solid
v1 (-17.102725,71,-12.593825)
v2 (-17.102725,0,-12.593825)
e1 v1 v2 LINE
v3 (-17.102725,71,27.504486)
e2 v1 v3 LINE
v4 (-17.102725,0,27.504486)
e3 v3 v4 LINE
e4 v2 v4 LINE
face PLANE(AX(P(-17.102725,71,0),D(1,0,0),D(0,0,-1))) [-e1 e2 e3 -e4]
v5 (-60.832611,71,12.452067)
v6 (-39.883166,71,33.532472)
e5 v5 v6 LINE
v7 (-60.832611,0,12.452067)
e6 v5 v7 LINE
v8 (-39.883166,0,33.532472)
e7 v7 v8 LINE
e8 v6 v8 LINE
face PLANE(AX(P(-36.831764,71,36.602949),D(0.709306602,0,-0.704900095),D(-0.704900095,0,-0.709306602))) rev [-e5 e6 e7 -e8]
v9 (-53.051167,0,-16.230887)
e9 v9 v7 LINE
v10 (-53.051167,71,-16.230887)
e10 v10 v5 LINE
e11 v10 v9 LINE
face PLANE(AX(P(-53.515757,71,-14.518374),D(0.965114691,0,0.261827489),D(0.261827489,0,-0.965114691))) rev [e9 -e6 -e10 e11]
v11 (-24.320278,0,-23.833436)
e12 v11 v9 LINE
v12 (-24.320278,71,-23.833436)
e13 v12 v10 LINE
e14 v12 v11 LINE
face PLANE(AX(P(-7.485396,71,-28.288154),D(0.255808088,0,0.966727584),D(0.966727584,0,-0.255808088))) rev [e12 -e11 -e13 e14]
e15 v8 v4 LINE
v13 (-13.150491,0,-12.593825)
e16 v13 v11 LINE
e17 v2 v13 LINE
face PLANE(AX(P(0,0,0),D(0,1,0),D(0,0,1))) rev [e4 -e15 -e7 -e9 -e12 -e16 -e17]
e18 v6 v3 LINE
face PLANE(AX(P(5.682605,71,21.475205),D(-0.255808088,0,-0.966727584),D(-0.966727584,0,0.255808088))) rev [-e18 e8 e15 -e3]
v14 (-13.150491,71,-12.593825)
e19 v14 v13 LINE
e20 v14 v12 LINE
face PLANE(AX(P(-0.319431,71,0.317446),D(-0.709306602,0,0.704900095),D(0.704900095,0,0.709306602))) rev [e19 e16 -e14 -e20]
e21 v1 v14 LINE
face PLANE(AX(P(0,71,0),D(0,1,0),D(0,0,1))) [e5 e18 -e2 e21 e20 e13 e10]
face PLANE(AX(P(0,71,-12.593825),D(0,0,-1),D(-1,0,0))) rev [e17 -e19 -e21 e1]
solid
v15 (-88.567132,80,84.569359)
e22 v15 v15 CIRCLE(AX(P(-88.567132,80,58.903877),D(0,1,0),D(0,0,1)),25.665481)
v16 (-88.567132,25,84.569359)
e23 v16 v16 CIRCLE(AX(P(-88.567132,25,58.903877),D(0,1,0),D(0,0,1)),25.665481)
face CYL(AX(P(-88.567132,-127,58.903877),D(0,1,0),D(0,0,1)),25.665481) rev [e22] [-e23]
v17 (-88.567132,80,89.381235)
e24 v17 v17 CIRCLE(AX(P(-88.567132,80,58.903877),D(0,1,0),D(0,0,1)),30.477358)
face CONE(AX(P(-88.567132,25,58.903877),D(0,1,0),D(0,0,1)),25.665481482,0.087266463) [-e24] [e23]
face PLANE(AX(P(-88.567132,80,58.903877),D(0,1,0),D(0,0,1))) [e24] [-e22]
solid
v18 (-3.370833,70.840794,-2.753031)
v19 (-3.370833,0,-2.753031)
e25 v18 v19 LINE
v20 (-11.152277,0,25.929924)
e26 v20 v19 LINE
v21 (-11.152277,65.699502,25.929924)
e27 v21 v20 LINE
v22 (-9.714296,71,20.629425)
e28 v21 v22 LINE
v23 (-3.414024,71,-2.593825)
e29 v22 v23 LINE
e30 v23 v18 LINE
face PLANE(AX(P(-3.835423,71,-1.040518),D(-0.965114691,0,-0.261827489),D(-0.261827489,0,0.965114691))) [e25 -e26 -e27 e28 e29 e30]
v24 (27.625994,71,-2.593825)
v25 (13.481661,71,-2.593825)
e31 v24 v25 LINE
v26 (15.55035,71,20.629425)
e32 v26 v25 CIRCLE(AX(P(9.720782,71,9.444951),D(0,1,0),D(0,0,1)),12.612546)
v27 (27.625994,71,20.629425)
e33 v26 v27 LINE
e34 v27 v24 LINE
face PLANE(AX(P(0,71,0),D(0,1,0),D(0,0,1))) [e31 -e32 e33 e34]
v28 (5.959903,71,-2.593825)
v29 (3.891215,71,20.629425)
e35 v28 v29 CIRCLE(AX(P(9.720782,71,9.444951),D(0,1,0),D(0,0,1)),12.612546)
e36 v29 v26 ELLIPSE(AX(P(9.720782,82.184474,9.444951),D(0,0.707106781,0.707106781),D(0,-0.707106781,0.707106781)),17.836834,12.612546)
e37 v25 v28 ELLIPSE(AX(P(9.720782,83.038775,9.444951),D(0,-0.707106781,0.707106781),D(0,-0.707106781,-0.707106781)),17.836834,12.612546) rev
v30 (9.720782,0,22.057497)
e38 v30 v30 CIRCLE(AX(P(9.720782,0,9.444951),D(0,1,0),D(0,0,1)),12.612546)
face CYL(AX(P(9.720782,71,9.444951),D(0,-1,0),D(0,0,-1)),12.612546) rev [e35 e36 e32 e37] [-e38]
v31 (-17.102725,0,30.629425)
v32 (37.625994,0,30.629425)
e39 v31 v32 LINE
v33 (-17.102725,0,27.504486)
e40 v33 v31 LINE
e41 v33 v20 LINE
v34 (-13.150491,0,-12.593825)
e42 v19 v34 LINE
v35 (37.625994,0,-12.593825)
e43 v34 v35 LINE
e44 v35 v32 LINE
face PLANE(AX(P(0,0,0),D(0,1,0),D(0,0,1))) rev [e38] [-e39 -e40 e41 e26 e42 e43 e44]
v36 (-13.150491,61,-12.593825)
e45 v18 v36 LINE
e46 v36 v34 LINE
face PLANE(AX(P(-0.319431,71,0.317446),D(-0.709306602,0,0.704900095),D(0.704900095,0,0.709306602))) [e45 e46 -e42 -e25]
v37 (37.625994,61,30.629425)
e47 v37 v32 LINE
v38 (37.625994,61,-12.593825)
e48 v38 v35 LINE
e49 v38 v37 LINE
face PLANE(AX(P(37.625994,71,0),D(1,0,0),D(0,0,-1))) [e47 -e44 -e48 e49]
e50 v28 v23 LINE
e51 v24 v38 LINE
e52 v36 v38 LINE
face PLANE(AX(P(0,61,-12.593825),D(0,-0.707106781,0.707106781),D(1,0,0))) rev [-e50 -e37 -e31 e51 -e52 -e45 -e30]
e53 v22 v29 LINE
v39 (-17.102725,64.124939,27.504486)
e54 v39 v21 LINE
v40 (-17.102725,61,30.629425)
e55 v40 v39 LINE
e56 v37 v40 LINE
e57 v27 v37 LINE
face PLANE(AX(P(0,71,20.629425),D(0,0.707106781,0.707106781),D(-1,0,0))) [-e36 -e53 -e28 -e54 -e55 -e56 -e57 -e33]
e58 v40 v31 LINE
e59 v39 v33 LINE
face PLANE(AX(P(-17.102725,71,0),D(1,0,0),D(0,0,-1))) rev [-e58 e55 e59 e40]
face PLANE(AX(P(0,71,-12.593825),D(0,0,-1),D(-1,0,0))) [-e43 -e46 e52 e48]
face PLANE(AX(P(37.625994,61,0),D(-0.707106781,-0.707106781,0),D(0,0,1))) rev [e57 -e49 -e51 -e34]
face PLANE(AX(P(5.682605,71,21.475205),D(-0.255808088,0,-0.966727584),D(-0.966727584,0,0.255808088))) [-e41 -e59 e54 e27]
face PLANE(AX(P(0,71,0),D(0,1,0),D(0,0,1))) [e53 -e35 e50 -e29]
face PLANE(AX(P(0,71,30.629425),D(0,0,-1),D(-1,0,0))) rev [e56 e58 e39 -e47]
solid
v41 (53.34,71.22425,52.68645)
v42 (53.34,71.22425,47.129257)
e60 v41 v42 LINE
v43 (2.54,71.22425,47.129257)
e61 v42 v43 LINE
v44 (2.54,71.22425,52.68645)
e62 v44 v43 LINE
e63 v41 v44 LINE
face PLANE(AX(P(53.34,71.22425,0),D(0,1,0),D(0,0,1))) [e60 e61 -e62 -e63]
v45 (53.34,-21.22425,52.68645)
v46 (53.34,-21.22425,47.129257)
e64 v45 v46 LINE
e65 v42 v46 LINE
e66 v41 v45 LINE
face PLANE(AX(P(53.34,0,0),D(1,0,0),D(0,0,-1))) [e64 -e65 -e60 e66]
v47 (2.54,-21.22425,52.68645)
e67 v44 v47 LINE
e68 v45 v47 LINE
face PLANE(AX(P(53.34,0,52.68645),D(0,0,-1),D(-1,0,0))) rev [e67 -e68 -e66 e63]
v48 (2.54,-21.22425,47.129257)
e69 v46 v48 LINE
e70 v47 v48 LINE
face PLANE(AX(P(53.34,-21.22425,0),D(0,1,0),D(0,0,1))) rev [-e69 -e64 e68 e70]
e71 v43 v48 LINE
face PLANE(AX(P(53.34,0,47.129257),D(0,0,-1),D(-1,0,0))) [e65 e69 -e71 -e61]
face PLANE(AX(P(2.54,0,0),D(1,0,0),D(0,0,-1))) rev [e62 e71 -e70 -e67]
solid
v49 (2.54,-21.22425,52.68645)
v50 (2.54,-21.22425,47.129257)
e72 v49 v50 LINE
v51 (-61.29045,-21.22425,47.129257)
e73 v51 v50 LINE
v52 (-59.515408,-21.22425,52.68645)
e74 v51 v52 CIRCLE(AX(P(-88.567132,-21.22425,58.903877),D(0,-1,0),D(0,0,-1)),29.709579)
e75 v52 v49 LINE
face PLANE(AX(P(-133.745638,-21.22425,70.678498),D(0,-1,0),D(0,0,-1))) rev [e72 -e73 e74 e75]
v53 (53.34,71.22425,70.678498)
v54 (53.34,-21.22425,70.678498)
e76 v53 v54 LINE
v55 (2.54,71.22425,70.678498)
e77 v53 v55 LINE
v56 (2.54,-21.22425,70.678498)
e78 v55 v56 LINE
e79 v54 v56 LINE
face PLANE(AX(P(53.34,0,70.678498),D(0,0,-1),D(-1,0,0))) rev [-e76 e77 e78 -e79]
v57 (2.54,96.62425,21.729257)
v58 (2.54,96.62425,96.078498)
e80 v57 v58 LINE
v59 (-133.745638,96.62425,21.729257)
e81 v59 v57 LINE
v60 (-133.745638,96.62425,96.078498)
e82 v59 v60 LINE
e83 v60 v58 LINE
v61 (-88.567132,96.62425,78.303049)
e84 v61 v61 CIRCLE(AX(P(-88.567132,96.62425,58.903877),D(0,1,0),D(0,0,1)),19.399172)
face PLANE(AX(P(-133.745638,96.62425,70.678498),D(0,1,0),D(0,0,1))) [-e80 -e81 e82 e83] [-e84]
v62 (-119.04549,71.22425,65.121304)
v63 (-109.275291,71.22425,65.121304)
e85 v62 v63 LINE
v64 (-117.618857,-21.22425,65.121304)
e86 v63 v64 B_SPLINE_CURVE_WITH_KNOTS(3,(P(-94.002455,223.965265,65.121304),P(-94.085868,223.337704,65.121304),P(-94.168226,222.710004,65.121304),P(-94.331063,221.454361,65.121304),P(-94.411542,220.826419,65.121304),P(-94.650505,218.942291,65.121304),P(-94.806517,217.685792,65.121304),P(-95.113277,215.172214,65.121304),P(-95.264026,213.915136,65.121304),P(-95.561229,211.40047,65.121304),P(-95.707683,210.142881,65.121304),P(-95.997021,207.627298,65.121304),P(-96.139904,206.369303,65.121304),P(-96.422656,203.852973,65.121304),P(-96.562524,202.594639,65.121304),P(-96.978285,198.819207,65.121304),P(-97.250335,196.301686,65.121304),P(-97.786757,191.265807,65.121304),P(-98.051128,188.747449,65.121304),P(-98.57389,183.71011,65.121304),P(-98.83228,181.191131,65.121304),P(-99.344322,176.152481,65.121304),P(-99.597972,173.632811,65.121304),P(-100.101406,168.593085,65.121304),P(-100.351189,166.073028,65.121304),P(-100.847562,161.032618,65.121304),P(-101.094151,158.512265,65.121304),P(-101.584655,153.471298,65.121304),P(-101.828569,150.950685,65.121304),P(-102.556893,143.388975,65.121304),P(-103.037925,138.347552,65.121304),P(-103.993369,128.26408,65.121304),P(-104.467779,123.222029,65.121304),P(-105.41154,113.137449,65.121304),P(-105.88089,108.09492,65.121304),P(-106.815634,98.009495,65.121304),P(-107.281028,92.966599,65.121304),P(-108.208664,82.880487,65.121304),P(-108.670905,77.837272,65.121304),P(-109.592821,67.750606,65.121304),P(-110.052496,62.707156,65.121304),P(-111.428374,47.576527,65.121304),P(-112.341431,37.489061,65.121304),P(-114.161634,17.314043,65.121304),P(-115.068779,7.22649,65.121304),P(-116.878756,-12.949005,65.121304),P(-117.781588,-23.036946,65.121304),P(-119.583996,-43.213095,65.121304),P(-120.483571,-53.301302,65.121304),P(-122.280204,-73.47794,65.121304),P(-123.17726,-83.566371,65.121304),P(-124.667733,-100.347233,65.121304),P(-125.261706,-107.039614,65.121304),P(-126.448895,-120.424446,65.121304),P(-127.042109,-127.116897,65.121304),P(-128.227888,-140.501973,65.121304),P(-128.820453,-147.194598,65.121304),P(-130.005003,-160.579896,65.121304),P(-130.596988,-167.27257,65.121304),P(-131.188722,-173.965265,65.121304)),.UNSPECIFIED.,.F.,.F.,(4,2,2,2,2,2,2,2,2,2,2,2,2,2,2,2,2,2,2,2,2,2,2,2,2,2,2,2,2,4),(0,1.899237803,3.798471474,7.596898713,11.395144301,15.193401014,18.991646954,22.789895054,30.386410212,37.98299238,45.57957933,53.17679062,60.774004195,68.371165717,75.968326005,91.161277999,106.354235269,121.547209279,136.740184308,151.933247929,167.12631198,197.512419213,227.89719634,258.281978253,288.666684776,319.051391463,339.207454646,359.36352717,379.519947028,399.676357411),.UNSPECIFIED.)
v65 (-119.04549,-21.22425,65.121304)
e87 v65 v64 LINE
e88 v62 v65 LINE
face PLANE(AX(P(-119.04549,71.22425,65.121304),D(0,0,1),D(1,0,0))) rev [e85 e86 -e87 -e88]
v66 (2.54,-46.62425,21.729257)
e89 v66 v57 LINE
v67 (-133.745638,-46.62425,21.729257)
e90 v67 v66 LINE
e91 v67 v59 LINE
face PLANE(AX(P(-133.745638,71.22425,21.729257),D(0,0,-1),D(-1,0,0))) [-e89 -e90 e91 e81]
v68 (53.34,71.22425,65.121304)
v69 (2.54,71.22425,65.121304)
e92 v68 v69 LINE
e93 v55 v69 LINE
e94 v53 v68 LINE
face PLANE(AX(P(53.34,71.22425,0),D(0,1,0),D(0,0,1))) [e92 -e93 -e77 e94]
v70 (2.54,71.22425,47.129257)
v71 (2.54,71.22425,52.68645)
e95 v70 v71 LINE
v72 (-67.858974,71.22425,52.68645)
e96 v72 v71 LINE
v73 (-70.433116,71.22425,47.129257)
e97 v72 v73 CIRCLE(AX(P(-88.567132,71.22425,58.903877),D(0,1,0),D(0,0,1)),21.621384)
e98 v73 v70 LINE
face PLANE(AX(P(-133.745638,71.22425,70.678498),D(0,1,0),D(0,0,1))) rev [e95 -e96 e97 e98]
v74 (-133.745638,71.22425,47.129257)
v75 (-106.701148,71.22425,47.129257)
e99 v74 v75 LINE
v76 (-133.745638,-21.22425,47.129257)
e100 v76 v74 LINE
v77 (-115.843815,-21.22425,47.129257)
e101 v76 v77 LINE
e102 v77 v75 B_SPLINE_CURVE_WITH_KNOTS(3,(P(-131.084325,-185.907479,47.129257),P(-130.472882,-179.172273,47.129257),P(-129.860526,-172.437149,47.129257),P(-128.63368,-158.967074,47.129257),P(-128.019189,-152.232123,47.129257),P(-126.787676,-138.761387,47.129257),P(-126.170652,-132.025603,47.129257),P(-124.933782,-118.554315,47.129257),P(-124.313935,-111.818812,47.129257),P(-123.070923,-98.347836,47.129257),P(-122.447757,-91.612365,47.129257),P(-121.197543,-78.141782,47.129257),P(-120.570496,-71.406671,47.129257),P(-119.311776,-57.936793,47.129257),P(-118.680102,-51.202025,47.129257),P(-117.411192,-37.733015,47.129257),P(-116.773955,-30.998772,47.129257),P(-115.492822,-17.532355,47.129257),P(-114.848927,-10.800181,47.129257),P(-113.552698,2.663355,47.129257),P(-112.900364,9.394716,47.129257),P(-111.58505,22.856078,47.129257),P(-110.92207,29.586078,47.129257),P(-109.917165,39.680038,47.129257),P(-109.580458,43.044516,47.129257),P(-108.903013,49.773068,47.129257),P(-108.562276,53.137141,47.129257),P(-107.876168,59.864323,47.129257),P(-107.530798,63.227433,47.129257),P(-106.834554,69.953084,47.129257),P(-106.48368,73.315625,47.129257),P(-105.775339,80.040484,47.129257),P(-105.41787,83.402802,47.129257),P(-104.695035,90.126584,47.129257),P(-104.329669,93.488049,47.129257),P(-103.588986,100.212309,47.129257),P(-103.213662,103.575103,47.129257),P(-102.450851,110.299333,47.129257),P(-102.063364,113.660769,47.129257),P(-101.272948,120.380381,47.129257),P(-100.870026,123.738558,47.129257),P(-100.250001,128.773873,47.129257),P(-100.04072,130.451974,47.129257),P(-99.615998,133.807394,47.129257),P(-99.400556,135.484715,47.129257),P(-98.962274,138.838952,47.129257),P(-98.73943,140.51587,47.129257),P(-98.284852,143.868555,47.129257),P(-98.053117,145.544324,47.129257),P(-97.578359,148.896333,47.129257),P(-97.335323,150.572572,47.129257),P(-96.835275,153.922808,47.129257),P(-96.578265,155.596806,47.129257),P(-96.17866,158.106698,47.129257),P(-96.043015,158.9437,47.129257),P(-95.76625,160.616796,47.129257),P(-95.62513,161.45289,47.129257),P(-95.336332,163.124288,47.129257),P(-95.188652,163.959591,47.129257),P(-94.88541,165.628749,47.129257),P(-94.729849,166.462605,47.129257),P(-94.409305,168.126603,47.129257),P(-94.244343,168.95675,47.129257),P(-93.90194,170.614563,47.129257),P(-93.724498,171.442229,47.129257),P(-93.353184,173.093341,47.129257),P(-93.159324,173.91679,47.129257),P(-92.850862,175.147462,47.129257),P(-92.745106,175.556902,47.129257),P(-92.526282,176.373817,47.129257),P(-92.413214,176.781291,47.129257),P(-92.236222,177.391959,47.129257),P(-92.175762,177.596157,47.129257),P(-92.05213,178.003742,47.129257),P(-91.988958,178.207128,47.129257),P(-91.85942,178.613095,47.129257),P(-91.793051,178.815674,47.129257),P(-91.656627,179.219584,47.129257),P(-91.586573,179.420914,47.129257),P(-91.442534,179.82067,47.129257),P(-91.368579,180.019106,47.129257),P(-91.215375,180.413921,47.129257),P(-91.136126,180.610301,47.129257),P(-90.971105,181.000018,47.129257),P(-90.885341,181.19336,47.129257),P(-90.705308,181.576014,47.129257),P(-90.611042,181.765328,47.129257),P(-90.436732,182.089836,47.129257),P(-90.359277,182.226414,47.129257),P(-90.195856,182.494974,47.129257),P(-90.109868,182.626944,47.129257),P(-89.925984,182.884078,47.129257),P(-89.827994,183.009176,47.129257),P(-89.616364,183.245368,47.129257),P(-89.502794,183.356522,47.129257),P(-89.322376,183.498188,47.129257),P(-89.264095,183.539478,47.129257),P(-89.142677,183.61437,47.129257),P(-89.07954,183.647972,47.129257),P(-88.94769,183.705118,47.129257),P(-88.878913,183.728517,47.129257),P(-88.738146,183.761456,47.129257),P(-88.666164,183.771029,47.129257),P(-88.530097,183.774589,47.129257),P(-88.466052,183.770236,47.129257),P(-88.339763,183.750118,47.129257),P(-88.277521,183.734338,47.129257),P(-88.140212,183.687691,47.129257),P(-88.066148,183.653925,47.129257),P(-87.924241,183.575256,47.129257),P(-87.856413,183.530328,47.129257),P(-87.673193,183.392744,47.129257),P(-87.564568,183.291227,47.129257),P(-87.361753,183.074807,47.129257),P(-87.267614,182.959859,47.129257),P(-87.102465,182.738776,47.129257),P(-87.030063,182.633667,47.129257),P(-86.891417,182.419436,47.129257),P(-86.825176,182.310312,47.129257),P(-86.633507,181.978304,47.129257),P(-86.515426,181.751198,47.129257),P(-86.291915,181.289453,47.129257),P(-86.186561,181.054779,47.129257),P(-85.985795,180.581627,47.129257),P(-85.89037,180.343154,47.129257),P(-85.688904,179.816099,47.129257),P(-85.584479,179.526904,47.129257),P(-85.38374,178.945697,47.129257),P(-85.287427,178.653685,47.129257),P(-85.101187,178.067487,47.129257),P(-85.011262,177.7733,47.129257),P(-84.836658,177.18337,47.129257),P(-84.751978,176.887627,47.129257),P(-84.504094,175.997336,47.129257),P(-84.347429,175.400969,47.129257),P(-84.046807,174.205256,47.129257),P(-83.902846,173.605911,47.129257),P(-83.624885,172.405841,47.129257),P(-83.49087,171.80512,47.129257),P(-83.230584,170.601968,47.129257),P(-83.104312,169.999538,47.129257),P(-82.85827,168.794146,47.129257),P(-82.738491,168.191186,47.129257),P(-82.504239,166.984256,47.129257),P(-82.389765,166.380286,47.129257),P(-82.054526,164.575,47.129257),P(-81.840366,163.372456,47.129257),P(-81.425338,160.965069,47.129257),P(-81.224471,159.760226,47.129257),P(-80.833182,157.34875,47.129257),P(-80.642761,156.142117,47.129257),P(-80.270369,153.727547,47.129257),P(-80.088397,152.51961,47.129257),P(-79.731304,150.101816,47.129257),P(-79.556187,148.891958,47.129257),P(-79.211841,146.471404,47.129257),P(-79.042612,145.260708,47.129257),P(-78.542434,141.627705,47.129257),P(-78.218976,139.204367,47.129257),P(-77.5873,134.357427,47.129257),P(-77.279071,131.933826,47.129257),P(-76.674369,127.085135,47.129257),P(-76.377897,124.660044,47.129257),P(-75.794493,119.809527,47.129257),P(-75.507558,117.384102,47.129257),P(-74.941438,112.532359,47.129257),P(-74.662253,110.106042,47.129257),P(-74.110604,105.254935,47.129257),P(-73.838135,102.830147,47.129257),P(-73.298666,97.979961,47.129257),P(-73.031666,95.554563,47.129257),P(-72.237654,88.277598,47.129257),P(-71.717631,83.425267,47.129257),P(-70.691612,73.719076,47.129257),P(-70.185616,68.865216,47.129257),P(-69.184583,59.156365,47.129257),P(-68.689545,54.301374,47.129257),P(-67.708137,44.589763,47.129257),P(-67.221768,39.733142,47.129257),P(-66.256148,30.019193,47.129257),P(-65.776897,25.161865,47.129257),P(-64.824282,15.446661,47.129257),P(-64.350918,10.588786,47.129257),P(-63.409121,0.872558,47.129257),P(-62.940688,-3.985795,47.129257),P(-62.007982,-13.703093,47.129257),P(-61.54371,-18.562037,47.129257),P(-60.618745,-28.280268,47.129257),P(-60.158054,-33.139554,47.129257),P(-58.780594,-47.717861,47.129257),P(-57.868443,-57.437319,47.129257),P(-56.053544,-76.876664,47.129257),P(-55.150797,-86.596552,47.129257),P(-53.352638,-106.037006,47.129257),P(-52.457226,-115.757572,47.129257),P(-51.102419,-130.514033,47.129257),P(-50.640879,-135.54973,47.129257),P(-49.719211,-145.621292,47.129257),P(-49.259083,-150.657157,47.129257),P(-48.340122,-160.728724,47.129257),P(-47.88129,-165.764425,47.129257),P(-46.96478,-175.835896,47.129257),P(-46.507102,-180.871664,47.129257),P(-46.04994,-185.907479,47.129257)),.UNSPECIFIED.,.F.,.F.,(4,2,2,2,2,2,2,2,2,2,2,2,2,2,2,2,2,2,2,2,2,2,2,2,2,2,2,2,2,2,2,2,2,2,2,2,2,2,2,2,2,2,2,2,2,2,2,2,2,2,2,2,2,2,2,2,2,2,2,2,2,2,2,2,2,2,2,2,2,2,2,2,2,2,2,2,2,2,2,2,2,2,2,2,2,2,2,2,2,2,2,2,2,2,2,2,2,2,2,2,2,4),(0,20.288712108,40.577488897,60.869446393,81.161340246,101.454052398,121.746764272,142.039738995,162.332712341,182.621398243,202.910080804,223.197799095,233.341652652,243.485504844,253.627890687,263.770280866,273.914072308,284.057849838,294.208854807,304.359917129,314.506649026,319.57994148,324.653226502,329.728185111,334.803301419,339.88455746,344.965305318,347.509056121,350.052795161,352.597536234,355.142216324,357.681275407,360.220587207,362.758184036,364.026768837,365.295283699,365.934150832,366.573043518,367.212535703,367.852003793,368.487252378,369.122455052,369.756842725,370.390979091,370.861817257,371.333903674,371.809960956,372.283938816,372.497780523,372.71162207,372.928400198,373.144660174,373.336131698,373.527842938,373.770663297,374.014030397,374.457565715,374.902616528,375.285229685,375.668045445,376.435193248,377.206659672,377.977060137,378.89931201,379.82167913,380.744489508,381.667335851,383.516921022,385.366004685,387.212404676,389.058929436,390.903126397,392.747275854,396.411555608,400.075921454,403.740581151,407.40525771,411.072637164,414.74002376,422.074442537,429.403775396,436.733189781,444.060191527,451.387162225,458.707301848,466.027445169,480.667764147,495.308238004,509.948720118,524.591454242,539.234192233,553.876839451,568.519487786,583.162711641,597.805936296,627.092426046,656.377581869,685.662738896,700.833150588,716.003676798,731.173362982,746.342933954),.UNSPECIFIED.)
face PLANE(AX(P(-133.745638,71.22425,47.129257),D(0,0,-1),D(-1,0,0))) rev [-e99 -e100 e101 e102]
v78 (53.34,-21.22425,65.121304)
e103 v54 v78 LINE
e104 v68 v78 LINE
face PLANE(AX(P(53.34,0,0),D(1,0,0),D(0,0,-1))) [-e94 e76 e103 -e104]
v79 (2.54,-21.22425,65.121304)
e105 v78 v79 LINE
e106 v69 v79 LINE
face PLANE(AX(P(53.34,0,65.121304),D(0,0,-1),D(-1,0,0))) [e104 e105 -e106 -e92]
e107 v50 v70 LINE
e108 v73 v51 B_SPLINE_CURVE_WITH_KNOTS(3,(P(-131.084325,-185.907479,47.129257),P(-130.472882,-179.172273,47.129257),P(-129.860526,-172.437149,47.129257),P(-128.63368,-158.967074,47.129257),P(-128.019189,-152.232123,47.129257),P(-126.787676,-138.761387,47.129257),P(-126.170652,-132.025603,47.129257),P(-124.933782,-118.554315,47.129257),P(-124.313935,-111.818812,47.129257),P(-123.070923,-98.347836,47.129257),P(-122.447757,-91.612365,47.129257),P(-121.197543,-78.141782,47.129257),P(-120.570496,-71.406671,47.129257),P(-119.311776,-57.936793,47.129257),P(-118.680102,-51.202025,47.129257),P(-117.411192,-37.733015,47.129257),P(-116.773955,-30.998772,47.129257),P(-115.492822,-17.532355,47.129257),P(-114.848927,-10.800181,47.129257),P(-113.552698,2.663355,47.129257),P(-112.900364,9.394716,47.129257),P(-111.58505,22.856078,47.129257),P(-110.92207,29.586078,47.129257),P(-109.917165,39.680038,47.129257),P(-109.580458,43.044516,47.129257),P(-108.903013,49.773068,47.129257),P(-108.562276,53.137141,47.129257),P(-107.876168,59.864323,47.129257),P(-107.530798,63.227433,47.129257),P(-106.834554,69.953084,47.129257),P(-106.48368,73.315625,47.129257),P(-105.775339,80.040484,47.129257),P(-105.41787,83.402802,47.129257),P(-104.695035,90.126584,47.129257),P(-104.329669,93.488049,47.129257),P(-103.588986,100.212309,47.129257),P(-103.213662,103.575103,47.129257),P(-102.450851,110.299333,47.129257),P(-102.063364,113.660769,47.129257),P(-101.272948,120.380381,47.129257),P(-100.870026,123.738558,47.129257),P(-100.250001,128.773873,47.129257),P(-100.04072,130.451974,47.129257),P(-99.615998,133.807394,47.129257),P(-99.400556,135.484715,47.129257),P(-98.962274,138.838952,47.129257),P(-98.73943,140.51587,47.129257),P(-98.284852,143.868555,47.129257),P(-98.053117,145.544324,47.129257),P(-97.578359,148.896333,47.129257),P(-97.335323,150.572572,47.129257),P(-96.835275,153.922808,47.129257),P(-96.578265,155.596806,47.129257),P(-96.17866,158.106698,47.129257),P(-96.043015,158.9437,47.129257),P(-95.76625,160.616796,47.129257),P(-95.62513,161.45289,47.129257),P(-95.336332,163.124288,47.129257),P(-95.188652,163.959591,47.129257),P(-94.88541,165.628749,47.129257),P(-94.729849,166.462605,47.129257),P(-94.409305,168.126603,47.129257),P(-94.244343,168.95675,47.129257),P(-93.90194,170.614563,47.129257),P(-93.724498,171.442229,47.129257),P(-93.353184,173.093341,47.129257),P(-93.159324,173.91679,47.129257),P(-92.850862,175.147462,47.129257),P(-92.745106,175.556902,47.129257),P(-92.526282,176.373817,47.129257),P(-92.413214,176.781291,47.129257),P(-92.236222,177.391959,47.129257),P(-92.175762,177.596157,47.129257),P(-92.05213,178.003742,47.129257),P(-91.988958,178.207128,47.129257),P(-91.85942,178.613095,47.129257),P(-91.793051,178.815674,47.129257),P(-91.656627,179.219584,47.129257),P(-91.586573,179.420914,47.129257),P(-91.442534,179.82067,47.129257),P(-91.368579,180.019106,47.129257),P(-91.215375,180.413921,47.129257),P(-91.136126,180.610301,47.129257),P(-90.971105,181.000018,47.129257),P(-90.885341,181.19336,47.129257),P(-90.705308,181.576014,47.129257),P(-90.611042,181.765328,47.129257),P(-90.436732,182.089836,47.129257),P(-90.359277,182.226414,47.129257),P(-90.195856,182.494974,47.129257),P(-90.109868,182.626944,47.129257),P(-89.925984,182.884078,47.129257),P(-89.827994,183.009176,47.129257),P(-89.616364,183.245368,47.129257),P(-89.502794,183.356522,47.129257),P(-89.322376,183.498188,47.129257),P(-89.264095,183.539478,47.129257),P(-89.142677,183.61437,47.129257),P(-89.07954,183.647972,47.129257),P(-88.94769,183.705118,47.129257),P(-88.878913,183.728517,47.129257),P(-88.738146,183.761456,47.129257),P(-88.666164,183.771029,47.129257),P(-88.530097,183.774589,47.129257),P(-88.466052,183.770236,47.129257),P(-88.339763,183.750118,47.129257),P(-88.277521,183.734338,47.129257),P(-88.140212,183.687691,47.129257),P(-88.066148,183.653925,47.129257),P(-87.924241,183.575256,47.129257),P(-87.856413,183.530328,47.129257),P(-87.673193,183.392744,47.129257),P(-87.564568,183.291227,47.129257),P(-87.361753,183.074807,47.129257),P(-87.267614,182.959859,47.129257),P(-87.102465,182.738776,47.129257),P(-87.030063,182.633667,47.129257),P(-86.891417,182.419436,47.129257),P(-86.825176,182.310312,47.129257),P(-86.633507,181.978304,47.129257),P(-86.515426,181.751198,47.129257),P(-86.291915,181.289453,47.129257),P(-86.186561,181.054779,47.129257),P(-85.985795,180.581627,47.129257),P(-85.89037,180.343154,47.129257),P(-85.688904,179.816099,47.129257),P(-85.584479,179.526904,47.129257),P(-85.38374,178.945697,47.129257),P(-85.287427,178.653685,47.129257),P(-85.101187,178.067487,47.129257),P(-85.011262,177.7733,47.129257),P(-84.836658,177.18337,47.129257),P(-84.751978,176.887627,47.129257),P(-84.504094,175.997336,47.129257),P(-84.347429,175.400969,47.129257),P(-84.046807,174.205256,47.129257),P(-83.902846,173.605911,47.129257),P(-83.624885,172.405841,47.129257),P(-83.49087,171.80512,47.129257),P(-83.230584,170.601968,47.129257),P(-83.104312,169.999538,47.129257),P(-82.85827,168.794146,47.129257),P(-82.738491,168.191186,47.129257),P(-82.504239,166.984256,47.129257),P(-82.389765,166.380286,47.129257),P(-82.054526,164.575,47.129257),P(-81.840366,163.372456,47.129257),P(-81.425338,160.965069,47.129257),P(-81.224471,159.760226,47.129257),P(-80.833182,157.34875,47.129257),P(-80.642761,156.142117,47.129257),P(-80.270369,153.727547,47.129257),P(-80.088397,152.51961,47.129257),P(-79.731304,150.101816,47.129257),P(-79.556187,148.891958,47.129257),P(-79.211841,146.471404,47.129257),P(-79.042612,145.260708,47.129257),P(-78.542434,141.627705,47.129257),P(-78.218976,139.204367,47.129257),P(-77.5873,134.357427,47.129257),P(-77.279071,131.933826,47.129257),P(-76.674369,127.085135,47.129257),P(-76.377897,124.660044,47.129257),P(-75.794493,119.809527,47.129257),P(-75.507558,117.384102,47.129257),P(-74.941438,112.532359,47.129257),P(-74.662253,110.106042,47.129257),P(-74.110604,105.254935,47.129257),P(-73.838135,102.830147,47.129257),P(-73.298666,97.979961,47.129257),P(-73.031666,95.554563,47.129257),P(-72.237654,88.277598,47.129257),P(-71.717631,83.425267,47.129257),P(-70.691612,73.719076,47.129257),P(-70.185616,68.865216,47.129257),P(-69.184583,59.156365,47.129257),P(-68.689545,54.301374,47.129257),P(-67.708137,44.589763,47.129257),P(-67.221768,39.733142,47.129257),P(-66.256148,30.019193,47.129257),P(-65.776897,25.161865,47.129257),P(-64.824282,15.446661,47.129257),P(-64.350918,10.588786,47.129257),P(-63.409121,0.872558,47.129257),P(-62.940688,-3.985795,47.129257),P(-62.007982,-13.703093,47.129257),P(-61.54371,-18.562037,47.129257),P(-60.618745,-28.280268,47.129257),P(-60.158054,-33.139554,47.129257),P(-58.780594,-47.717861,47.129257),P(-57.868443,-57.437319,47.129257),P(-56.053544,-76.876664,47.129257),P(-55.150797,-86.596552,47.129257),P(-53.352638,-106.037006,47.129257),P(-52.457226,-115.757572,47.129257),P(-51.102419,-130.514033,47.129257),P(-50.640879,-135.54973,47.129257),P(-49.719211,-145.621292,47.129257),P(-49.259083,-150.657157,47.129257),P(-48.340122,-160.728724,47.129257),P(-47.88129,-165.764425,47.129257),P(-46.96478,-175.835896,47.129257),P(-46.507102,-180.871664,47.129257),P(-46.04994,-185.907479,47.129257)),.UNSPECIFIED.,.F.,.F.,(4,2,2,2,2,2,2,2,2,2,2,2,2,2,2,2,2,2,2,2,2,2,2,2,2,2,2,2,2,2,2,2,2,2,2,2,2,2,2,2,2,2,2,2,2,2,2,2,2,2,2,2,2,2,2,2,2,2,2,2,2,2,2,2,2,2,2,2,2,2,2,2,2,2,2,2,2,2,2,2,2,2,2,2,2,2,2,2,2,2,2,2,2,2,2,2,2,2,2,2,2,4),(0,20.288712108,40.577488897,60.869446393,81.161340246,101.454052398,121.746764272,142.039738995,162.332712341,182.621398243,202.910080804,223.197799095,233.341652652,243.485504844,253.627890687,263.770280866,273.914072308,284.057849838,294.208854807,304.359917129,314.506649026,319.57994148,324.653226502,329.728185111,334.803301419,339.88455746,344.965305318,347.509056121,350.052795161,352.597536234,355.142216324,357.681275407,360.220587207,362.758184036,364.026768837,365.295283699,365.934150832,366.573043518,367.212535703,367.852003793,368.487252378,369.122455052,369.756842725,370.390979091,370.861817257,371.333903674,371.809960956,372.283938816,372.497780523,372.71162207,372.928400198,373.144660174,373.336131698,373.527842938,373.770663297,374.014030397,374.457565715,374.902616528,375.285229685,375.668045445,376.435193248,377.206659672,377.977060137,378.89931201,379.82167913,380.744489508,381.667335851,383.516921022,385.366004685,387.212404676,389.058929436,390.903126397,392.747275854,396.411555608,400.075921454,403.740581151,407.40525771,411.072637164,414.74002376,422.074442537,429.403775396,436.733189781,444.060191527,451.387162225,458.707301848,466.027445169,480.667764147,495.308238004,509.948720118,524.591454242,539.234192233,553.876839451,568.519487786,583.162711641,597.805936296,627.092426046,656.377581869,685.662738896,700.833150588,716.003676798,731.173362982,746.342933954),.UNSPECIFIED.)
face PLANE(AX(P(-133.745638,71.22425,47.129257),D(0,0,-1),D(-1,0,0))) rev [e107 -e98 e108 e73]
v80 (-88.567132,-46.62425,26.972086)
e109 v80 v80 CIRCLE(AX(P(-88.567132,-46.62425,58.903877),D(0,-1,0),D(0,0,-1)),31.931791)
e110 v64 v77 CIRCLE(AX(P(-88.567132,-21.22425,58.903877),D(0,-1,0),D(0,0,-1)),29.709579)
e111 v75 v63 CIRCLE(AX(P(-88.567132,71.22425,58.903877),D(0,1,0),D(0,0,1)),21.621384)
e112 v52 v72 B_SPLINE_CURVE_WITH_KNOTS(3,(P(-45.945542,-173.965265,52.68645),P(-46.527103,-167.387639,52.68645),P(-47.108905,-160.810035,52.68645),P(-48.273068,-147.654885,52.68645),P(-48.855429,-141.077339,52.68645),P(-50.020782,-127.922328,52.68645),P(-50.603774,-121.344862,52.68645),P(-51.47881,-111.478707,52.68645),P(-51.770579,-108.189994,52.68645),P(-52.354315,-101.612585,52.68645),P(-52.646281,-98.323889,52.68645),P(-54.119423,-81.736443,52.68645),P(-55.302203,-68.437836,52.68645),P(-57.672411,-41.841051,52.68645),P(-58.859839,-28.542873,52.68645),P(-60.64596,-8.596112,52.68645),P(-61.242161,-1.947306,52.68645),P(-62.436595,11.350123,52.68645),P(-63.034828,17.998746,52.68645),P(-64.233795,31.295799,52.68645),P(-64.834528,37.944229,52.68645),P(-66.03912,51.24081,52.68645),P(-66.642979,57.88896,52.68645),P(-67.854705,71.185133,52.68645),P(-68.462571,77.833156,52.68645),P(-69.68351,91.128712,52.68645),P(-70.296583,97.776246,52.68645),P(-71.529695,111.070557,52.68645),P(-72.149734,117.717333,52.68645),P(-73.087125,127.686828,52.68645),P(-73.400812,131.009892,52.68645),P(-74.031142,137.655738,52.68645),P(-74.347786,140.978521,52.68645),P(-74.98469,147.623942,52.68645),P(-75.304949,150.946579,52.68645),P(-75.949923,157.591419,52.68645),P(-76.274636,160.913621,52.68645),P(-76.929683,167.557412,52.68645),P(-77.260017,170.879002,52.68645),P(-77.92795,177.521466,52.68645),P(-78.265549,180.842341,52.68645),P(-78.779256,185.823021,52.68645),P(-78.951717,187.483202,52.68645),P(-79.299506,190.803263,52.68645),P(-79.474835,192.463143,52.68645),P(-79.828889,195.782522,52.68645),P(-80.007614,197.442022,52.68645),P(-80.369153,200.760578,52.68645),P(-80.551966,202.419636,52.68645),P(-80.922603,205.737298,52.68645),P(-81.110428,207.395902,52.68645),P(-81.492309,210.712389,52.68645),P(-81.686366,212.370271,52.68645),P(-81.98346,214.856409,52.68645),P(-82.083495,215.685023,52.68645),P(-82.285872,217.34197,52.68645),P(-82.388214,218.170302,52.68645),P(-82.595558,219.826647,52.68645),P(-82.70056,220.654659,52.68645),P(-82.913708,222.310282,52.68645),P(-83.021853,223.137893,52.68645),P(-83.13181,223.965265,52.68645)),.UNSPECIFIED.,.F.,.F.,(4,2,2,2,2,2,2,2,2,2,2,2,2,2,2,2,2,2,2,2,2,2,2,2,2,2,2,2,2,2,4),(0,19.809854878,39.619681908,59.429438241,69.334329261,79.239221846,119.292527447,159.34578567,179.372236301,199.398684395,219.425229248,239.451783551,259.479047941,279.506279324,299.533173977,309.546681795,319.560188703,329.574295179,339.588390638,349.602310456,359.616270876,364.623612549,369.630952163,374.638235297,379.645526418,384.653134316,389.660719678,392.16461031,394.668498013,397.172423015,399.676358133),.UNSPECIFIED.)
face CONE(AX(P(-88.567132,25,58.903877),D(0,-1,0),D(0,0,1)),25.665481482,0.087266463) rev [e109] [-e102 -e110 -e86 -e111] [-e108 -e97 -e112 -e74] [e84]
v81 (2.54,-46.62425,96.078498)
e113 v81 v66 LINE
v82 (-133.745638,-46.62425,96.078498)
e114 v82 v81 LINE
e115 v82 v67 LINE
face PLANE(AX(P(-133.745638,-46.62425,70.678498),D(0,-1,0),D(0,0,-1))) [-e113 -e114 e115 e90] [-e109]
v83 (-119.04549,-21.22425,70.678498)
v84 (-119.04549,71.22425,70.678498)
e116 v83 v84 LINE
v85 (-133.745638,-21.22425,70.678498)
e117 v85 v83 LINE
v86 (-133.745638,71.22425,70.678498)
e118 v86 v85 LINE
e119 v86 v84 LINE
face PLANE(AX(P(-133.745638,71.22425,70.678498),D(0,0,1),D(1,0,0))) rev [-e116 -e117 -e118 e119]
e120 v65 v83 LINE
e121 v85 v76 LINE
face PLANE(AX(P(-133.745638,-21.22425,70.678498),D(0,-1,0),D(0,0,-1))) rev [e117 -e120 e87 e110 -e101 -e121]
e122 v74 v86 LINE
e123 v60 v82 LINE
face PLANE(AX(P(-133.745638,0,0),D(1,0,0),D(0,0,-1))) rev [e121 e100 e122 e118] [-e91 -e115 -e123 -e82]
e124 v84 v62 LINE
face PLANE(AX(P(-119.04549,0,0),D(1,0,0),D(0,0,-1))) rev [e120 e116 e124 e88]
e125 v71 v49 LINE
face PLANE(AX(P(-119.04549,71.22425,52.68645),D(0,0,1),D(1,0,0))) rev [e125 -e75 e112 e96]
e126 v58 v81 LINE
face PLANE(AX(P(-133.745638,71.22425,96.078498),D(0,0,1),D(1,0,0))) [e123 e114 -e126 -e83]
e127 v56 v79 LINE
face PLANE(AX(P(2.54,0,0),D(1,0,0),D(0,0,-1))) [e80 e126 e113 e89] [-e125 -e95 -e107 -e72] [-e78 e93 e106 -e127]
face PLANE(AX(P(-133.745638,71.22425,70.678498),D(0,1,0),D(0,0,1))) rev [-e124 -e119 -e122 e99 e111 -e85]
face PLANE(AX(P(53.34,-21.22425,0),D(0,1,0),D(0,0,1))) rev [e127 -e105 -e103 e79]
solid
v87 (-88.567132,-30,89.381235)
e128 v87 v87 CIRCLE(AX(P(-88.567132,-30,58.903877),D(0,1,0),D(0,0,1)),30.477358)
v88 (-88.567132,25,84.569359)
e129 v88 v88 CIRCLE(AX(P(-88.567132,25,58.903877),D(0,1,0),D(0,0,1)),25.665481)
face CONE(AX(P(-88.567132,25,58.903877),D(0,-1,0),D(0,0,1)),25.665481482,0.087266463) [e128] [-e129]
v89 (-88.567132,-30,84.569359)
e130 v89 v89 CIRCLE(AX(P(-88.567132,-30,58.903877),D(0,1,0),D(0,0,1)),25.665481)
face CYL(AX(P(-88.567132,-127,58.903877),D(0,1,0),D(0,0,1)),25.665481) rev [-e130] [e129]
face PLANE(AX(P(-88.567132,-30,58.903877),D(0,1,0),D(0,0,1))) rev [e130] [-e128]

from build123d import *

# Parameters (mm, degrees)
BOSS_EXTRUDE1_DEPTH           = 71
SKETCH1_R                     = 12.612546325
BOSS_EXTRUDE1_2_DEPTH         = 71
CHAMFER1_SIZE                 = 10
BOSS_EXTRUDE2_START           = 25
SKETCH2_R                     = 25.665481482
BOSS_EXTRUDE2_DEPTH           = 55
BOSS_EXTRUDE2_TAPER           = -5
BOSS_EXTRUDE2_OTHER_WAY_DEPTH = 55
BOSS_EXTRUDE2_OTHER_WAY_TAPER = -5
SKETCH2_3_R                   = 25.665481482
CUT_EXTRUDE1_DEPTH            = 127
EXTRUDE_THIN4_START           = -136.285637615
EXTRUDE_THIN4_OUTLINE_W       = 74.349241095
EXTRUDE_THIN4_OUTLINE_H       = 143.248499752
EXTRUDE_THIN4_OUTLINE_W_2     = 23.549241095
EXTRUDE_THIN4_OUTLINE_H_2     = 92.448499752
EXTRUDE_THIN4_DEPTH           = 136.285637615
EXTRUDE_THIN4_START_2         = -81.131505871
EXTRUDE_THIN4_3_OUTLINE_W     = 25.4
EXTRUDE_THIN4_3_OUTLINE_H     = 92.448499752
EXTRUDE_THIN4_3_DEPTH         = 81.131505871
EXTRUDE_THIN4_START_3         = -62.055403382
EXTRUDE_THIN4_5_OUTLINE_W     = 25.4
EXTRUDE_THIN4_5_OUTLINE_H     = 92.448499752
EXTRUDE_THIN4_5_DEPTH         = 62.055403382
EXTRUDE_THIN4_START_4         = -121.585490263
EXTRUDE_THIN4_6_OUTLINE_W     = 25.4
EXTRUDE_THIN4_6_OUTLINE_H     = 92.448499752
EXTRUDE_THIN4_6_DEPTH         = 1.426630024
EXTRUDE_THIN4_START_5         = 65.121304361
EXTRUDE_THIN4_7_OUTLINE_W     = 58.103456857
EXTRUDE_THIN4_7_OUTLINE_H     = 92.448499752
EXTRUDE_THIN4_7_DEPTH         = 25.4
SKETCH3_2_W                   = 5.557193525
SKETCH3_2_H                   = 92.448499752
SKETCH3_2_W_2                 = 5.557193524
BOSS_EXTRUDE3_DEPTH           = 50.8


with BuildPart() as part:
    # Sketch1 → Boss-Extrude1 (new body)
    with BuildSketch(Plane(origin=(0, 0, 0), x_dir=(1, 0, 0), z_dir=(0, 1, 0))):
        Polygon((-17.102724768, -27.50448581), (-17.102724768, 12.593824602), (-13.150491386, 12.593824602), (-24.320277596, 23.833435941), (-53.051166582, 16.230886979), (-60.83261054, -12.452067238), (-39.883165511, -33.532472492), align=None)
    extrude(amount=BOSS_EXTRUDE1_DEPTH)


with BuildPart() as body_2:
    # Sketch1 → Boss-Extrude1 2 (new body)
    with BuildSketch(Plane(origin=(0, 0, 0), x_dir=(1, 0, 0), z_dir=(0, 1, 0))):
        Polygon((37.625994489, 12.593824602), (-13.150491386, 12.593824602), (-3.370832568, 2.753030688), (-11.152276525, -25.929923529), (-17.102724768, -27.50448581), (-17.102724768, -30.629425265), (37.625994489, -30.629425265), align=None)
        with Locations(Location((9.720782427, -9.444950833, 0), (0, 0, 270))):
            Circle(SKETCH1_R, mode=Mode.SUBTRACT)
    extrude(amount=BOSS_EXTRUDE1_2_DEPTH)

    # Chamfer1
    # the kernel refuses this chamfer: 10 mm, written as the material it takes off along each edge
    with BuildSketch(Plane(origin=(63.342824368, 71, -12.593824602), x_dir=(0, -1, 0), z_dir=(-1, 0, 0))) as chamfer1_piece_1:
        Polygon((CHAMFER1_SIZE, 0), (0, CHAMFER1_SIZE), (0, 0), align=None)
    extrude(amount=102.210145634, mode=Mode.SUBTRACT)
    with BuildSketch(Plane(origin=(37.625994489, 71, 56.346255145), x_dir=(0, -1, 0), z_dir=(0, 0, -1))) as chamfer1_piece_2:
        Polygon((CHAMFER1_SIZE, 0), (0, CHAMFER1_SIZE), (0, 0), align=None)
    extrude(amount=94.656909626, mode=Mode.SUBTRACT)
    with BuildSketch(Plane(origin=(-42.819554647, 71, 30.629425265), x_dir=(0, -1, 0), z_dir=(1, 0, 0))) as chamfer1_piece_3:
        Polygon((CHAMFER1_SIZE, 0), (0, CHAMFER1_SIZE), (0, 0), align=None)
    extrude(amount=106.162379015, mode=Mode.SUBTRACT)


with BuildPart() as body_3:
    # Sketch2 → Boss-Extrude2 (new body)
    with BuildSketch(Plane(origin=(0, 0, 0), x_dir=(1, 0, 0), z_dir=(0, 1, 0)).offset(BOSS_EXTRUDE2_START)):
        with Locations((-88.567132287, -58.903877338)):
            Circle(SKETCH2_R)
    extrude(amount=BOSS_EXTRUDE2_DEPTH, taper=BOSS_EXTRUDE2_TAPER)

    # Sketch2 → Boss-Extrude2 other way (add)
    with BuildSketch(Plane(origin=(0, 0, 0), x_dir=(1, 0, 0), z_dir=(0, 1, 0)).offset(BOSS_EXTRUDE2_START)):
        with Locations((-88.567132287, -58.903877338)):
            Circle(SKETCH2_R)
    extrude(amount=-BOSS_EXTRUDE2_OTHER_WAY_DEPTH, taper=BOSS_EXTRUDE2_OTHER_WAY_TAPER)

    # Sketch2<3> → Cut-Extrude1 (cut, symmetric)
    with BuildSketch(Plane(origin=(0, 0, 0), x_dir=(1, 0, 0), z_dir=(0, 1, 0))):
        with Locations(Location((-88.567132287, -58.903877338, 0), (0, 0, 270))):
            Circle(SKETCH2_3_R)
    extrude(amount=CUT_EXTRUDE1_DEPTH, both=True, mode=Mode.SUBTRACT)


with BuildPart() as cut_extrude1_piece_1:
    # of the separate pieces the step leaves, piece 1, a body of its own (cut_extrude1_pieces)
    add(body_3.part.solids().sort_by_distance((-58.089774312, 80, 58.903877338))[0])


with BuildPart() as cut_extrude1_piece_2:
    # of the separate pieces the step leaves, piece 2, a body of its own (cut_extrude1_pieces)
    add(body_3.part.solids().sort_by_distance((-58.089774312, -30, 58.903877338))[0])


with BuildPart() as body_5:
    # Extrude-Thin4: read off the stored shape, not the designer's step
    # Extrude-Thin4 outline → Extrude-Thin4 (new body)
    with BuildSketch(Plane(origin=(2.54, 0, 0), x_dir=(0, 0, -1), z_dir=(1, 0, 0)).offset(EXTRUDE_THIN4_START)):
        with Locations((-58.903877339, 25)):
            Rectangle(EXTRUDE_THIN4_OUTLINE_W, EXTRUDE_THIN4_OUTLINE_H)
        with Locations((-58.903877339, 25)):
            Rectangle(EXTRUDE_THIN4_OUTLINE_W_2, EXTRUDE_THIN4_OUTLINE_H_2, mode=Mode.SUBTRACT)
    extrude(amount=EXTRUDE_THIN4_DEPTH)

    # Extrude-Thin4 2 outline → Extrude-Thin4 2 (revolve, cut)
    with BuildSketch(Plane(origin=(-88.567132287, 0, 58.903877338), x_dir=(1, 0, 0), z_dir=(0, 0, 1))):
        Polygon((0, -46.624249876), (31.931791379, -46.624249876), (19.399171584, 96.624249876), (0, 96.624249876), align=None)
    revolve(axis=Axis((-88.567132287, 0, 58.903877338), (0, 1, 0)), mode=Mode.SUBTRACT)



with BuildPart() as body_6:
    # Extrude-Thin4 3 outline → Extrude-Thin4 3 (new body)
    with BuildSketch(Plane(origin=(2.54, 0, 0), x_dir=(0, 0, -1), z_dir=(1, 0, 0)).offset(EXTRUDE_THIN4_START_2)):
        with Locations((-65.386450315, 25)):
            Rectangle(EXTRUDE_THIN4_3_OUTLINE_W, EXTRUDE_THIN4_3_OUTLINE_H)
    extrude(amount=EXTRUDE_THIN4_3_DEPTH)

    # Extrude-Thin4 4 outline → Extrude-Thin4 4 (revolve, cut)
    with BuildSketch(Plane(origin=(-88.567132287, 0, 58.903877338), x_dir=(1, 0, 0), z_dir=(0, 0, 1))):
        Polygon((0, -21.224249876), (29.709579326, -21.224249876), (21.621383594, 71.224250375), (0, 71.224250375), align=None)
    revolve(axis=Axis((-88.567132287, 0, 58.903877338), (0, 1, 0)), mode=Mode.SUBTRACT)


with BuildPart() as body_7:
    # Extrude-Thin4 5 outline → Extrude-Thin4 5 (new body)
    with BuildSketch(Plane(origin=(2.54, 0, 0), x_dir=(0, 0, -1), z_dir=(1, 0, 0)).offset(EXTRUDE_THIN4_START_3)):
        with Locations((-77.821304361, 25)):
            Rectangle(EXTRUDE_THIN4_5_OUTLINE_W, EXTRUDE_THIN4_5_OUTLINE_H)
    extrude(amount=EXTRUDE_THIN4_5_DEPTH)

    # Extrude-Thin4 6 outline → Extrude-Thin4 6 (add)
    with BuildSketch(Plane(origin=(2.54, 0, 0), x_dir=(0, 0, -1), z_dir=(1, 0, 0)).offset(EXTRUDE_THIN4_START_4)):
        with Locations((-77.821304361, 25)):
            Rectangle(EXTRUDE_THIN4_6_OUTLINE_W, EXTRUDE_THIN4_6_OUTLINE_H)
    extrude(amount=EXTRUDE_THIN4_6_DEPTH)

    # Extrude-Thin4 7 outline → Extrude-Thin4 7 (add)
    with BuildSketch(Plane.XY.offset(EXTRUDE_THIN4_START_5)):
        with Locations((-88.567131811, 25)):
            Rectangle(EXTRUDE_THIN4_7_OUTLINE_W, EXTRUDE_THIN4_7_OUTLINE_H)
    extrude(amount=EXTRUDE_THIN4_7_DEPTH)

    # Extrude-Thin4 8 outline → Extrude-Thin4 8 (revolve, cut)
    with BuildSketch(Plane(origin=(-88.567132287, 0, 58.903877338), x_dir=(1, 0, 0), z_dir=(0, 0, 1))):
        Polygon((0, -21.224249876), (29.709579326, -21.224249876), (21.621383635, 71.224249899), (0, 71.224249899), align=None)
    revolve(axis=Axis((-88.567132287, 0, 58.903877338), (0, 1, 0)), mode=Mode.SUBTRACT)


with BuildPart() as body_5_1:
    add(body_5.part)

    add(body_6.part)  # Boss-Extrude3 merges body 6

    add(body_7.part)  # Boss-Extrude3 merges body 7
    # Sketch3<2> → Boss-Extrude3 (add)
    with BuildSketch(Plane(origin=(2.54, 0, 0), x_dir=(0, 0, -1), z_dir=(1, 0, 0))):
        with Locations((-67.899901124, 25)):
            Rectangle(SKETCH3_2_W, SKETCH3_2_H)
        with Locations((-49.907853553, 25)):
            Rectangle(SKETCH3_2_W_2, SKETCH3_2_H)
    extrude(amount=BOSS_EXTRUDE3_DEPTH)


solid = Compound([part.part, body_2.part, cut_extrude1_piece_1.part, cut_extrude1_piece_2.part, body_5_1.part])
